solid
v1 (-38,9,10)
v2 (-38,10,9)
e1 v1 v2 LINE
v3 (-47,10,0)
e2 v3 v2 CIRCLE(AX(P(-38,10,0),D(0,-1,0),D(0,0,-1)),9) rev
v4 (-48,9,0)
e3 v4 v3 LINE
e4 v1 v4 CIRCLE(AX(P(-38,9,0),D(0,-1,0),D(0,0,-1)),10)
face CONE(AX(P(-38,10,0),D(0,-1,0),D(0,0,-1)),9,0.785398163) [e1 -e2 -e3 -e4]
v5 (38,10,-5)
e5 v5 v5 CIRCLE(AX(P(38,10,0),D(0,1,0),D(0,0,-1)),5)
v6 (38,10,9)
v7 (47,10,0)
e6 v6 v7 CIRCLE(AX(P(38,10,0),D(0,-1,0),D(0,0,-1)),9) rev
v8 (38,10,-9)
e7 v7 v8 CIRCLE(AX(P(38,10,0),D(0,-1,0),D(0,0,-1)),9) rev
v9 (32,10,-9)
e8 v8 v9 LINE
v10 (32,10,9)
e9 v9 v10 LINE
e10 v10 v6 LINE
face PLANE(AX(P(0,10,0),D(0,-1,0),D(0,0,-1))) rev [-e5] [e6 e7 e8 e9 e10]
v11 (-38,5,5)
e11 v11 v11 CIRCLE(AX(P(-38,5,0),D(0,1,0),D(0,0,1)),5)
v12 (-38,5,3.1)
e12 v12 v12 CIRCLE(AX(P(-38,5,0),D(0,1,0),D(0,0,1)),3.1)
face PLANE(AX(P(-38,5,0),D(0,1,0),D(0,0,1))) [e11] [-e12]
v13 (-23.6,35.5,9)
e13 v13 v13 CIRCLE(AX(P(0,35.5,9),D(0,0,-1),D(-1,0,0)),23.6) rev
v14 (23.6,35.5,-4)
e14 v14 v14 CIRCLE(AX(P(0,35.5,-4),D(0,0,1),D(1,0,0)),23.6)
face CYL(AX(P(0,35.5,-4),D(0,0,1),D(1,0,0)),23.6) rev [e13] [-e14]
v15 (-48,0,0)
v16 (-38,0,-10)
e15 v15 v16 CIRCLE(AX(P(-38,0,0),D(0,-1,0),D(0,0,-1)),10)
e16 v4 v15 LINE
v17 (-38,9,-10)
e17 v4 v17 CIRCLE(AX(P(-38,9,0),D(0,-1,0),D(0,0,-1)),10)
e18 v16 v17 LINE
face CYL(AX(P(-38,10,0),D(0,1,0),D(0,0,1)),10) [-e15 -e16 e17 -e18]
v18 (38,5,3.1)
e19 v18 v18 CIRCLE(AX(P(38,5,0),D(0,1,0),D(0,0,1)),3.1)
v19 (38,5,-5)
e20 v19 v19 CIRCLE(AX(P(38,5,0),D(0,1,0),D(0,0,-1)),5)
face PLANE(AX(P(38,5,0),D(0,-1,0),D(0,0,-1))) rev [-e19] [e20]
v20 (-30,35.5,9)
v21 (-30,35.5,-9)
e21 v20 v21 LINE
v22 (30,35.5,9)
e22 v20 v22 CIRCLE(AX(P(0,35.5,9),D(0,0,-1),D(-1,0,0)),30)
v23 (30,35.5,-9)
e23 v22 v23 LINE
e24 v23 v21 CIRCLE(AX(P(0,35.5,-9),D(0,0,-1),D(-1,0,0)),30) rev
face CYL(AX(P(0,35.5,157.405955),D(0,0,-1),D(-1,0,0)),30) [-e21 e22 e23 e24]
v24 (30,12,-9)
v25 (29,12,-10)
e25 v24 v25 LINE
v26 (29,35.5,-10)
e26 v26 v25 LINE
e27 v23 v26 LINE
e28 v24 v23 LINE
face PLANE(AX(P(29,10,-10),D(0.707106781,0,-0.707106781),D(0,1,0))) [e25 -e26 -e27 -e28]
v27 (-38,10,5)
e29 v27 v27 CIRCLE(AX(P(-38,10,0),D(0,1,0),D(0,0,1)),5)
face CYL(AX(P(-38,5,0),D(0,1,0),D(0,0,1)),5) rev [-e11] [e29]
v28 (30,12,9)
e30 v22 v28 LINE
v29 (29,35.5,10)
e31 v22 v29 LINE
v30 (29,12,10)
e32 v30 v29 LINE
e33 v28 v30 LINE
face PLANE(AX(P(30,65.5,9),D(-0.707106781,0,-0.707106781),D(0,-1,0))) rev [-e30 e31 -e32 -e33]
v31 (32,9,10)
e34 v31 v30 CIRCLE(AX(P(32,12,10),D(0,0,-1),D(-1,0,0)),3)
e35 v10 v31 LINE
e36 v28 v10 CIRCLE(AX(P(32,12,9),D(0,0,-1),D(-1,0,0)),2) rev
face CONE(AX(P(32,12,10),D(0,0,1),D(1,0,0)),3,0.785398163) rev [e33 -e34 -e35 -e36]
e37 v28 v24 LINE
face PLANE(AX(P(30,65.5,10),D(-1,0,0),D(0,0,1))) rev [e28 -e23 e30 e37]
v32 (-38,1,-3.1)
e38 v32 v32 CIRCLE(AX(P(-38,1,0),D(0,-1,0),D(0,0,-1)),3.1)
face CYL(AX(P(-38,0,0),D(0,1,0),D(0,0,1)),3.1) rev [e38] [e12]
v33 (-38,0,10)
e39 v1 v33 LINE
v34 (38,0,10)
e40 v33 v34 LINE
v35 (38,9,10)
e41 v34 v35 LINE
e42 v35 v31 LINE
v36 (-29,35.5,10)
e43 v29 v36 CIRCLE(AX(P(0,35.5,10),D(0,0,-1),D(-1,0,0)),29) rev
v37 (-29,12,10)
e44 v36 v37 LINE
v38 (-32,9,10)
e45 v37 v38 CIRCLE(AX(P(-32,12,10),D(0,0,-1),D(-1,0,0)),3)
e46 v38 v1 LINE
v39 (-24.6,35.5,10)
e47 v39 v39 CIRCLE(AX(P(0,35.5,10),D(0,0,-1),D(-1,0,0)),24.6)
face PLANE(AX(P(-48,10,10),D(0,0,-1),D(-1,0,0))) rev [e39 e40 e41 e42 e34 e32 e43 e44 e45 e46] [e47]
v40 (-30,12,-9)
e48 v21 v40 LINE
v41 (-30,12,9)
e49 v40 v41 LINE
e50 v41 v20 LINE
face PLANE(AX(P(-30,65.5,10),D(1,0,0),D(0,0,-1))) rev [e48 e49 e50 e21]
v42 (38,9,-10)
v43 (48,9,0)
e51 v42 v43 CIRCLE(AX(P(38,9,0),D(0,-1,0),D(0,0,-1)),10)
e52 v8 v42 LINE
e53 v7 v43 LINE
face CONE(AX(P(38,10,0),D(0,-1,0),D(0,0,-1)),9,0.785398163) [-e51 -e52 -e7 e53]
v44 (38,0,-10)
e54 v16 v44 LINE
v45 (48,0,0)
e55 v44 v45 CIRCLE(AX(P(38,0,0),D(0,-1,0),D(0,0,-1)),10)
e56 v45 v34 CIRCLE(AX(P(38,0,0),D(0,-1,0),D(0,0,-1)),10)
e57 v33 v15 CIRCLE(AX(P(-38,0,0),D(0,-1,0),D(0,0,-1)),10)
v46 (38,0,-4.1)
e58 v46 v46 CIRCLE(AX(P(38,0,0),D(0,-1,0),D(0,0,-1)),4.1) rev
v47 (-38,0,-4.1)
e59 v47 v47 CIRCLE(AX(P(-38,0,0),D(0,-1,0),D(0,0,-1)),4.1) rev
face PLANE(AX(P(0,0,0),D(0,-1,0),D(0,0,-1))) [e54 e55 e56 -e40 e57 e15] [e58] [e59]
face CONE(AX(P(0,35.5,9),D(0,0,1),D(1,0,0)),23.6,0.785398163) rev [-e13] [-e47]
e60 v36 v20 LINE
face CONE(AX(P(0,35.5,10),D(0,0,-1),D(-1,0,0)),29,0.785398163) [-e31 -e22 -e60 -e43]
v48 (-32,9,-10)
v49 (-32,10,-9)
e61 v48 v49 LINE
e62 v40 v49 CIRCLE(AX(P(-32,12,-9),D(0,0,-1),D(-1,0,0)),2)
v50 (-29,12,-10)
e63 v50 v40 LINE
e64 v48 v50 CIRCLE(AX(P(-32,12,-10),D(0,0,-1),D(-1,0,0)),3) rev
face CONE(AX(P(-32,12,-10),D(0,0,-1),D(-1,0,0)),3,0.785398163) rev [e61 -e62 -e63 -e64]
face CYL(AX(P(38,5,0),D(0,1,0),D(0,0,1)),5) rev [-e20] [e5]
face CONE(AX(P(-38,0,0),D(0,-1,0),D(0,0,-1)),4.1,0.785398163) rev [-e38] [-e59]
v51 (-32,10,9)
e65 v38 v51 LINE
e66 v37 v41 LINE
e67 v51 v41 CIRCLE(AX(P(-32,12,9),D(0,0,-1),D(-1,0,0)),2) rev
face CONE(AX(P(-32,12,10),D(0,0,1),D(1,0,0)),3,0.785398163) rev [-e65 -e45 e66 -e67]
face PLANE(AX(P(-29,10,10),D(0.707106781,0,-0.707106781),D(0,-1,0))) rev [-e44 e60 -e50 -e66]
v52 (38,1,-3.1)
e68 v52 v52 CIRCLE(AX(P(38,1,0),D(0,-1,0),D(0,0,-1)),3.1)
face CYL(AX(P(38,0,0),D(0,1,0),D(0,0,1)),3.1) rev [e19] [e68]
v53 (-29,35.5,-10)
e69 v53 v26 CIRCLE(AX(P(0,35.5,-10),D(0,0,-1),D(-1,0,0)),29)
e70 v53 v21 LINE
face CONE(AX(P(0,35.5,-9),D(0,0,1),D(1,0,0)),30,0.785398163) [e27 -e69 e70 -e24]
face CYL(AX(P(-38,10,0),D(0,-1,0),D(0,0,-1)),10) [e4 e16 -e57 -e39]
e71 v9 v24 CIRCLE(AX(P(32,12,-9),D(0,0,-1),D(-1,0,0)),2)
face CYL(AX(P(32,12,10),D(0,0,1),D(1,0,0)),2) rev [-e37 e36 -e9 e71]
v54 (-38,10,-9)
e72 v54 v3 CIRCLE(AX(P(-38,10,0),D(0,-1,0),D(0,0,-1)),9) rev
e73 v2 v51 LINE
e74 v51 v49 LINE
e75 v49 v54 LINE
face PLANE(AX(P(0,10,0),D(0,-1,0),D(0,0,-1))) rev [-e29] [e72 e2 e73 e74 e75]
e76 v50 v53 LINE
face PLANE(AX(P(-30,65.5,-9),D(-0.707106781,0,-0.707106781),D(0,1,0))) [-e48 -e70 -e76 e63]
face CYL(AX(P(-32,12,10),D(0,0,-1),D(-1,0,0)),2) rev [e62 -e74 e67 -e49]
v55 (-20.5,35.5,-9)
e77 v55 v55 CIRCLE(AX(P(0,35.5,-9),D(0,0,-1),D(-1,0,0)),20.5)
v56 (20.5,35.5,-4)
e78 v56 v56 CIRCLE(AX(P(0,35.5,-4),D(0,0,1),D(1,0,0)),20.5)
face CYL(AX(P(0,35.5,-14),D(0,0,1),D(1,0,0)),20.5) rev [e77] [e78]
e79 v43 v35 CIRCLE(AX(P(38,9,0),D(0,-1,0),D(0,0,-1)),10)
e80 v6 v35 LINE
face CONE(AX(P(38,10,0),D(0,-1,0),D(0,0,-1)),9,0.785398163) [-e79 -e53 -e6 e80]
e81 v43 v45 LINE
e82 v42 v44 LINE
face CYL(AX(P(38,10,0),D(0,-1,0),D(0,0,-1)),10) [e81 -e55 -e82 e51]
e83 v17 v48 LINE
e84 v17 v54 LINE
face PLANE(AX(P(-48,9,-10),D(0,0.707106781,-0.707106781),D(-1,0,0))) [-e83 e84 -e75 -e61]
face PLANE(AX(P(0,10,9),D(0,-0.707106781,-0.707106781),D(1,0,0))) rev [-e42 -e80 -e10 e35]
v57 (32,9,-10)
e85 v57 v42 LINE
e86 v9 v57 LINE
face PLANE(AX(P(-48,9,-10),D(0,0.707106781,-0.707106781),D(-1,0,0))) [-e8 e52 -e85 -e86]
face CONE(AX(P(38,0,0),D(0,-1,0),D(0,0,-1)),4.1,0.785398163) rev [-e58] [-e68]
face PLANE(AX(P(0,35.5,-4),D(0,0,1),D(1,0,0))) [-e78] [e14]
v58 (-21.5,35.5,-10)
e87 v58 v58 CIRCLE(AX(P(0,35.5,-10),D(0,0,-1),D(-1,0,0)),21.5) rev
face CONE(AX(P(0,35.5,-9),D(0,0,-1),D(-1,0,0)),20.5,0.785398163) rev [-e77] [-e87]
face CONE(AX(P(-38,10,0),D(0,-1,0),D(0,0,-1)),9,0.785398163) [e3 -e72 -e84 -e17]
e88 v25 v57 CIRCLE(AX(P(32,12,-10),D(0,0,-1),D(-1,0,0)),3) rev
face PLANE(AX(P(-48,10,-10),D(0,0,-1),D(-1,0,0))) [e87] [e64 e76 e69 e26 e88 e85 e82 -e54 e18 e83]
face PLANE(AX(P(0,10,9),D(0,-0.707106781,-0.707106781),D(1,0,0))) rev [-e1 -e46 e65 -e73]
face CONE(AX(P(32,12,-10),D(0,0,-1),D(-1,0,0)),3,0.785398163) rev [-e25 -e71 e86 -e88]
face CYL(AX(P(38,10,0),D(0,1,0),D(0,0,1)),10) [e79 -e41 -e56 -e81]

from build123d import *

# Parameters (mm, degrees)
SKETCH_1_W          = 96
SKETCH_1_H          = 20
EXTRUDE_1_DEPTH     = 10
SKETCH_2_R          = 5
CUT_EXTRUDE_1_DEPTH = 5
FILLET_1_R          = 10
SKETCH_3_R          = 3.1
CUT_EXTRUDE_2_DEPTH = 5
CHAMFER_1_SIZE      = 1
SKETCH_4_W          = 60
SKETCH_4_H          = 20
EXTRUDE_2_DEPTH     = 55.5
CUT_EXTRUDE_START   = -20
CUT_EXTRUDE_3_DEPTH = 20
SKETCH_6_4_R        = 23.6
CUT_EXTRUDE_4_DEPTH = 14
SKETCH_7_R          = 20.5
CUT_EXTRUDE_5_DEPTH = 10
FILLET_2_R          = 2
CHAMFER_2_SIZE      = 1
CHAMFER_3_SIZE      = 1


# Read off the part's stored shape, not the designer's step: 切除-拉伸3
with BuildPart() as part:
    # 草图1 → 凸台-拉伸1 (new body)
    with BuildSketch(Plane(origin=(0, 0, 0), x_dir=(1, 0, 0), z_dir=(0, 1, 0))):
        Rectangle(SKETCH_1_W, SKETCH_1_H)
    extrude(amount=EXTRUDE_1_DEPTH)

    # 草图2 → 切除-拉伸1 (cut)
    with BuildSketch(Plane(origin=(0, 10, 0), x_dir=(1, 0, 0), z_dir=(0, 1, 0))):
        with Locations(Location((-38, 0, 0), (0, 0, 270))):
            Circle(SKETCH_2_R)
        with Locations(Location((38, 0, 0), (0, 0, 90))):
            Circle(SKETCH_2_R)
    extrude(amount=-CUT_EXTRUDE_1_DEPTH, mode=Mode.SUBTRACT)

    # 圆角1
    fillet_1_edges = [part.edges().sort_by_distance(p)[0] for p in [
        (48, 5, -10),
        (48, 5, 10),
        (-48, 5, 10),
        (-48, 5, -10),
    ]]
    fillet(fillet_1_edges, radius=FILLET_1_R - 0.0001)  # a hair under: the kernel refuses the full size

    # 草图3 → 切除-拉伸2 (cut)
    with BuildSketch(Plane(origin=(0, 5, 0), x_dir=(1, 0, 0), z_dir=(0, 1, 0))):
        with Locations(Location((-38, 0, 0), (0, 0, 270))):
            Circle(SKETCH_3_R)
        with Locations(Location((38, 0, 0), (0, 0, 270))):
            Circle(SKETCH_3_R)
    extrude(amount=-CUT_EXTRUDE_2_DEPTH, mode=Mode.SUBTRACT)

    # 倒角1
    chamfer_1_edges = [part.edges().sort_by_distance(p)[0] for p in [
        (-38, 0, -3.1),
        (38, 0, -3.1),
    ]]
    chamfer(chamfer_1_edges, length=CHAMFER_1_SIZE)

    # 草图4 → 凸台-拉伸2 (add)
    with BuildSketch(Plane(origin=(0, 10, 0), x_dir=(1, 0, 0), z_dir=(0, 1, 0))):
        Rectangle(SKETCH_4_W, SKETCH_4_H)
    extrude(amount=EXTRUDE_2_DEPTH)

    # 切除-拉伸3 outline → 切除-拉伸3 (cut)
    with BuildSketch(Plane.XY.offset(10).offset(CUT_EXTRUDE_START)):
        with BuildLine():
            Line((-30, 65.5), (-30, 35.5))
            ThreePointArc((-30, 35.5), (-21.213203436, 56.713203436), (0, 65.5))
            Line((0, 65.5), (-30, 65.5))
        make_face()
        with BuildLine():
            Line((30, 65.5), (0, 65.5))
            ThreePointArc((0, 65.5), (21.213203436, 56.713203436), (30, 35.5))
            Line((30, 35.5), (30, 65.5))
        make_face()
    extrude(amount=CUT_EXTRUDE_3_DEPTH, mode=Mode.SUBTRACT)

    # 草图6<4> → 切除-拉伸4 (cut)
    with BuildSketch(Plane.XY.offset(10)):
        with Locations((0, 35.5)):
            Circle(SKETCH_6_4_R)
    extrude(amount=-CUT_EXTRUDE_4_DEPTH, mode=Mode.SUBTRACT)

    # 草图7 → 切除-拉伸5 (cut)
    with BuildSketch(Plane.XY.offset(-4)):
        with Locations((0, 35.5)):
            Circle(SKETCH_7_R)
    extrude(amount=-CUT_EXTRUDE_5_DEPTH, mode=Mode.SUBTRACT)

    # 圆角2
    fillet_2_edges = [part.edges().sort_by_distance(p)[0] for p in [
        (30, 10, 0),
        (-30, 10, 0),
    ]]
    fillet(fillet_2_edges, radius=FILLET_2_R)

    # 倒角2
    chamfer_2_edges = [part.edges().sort_by_distance(p)[0] for p in [
        (35.00005, 10, 10),
        (35.00005, 10, -10),
        (30.585786438, 10.585786438, -10),
        (30.585786438, 10.585786438, 10),
        (-30.585786438, 10.585786438, 10),
        (-30.585786438, 10.585786438, -10),
        (-35.00005, 10, -10),
        (-35.00005, 10, 10),
        (-45.071097101, 10, -7.071097101),
        (-45.071097101, 10, 7.071097101),
        (45.071097101, 10, 7.071097101),
        (45.071097101, 10, -7.071097101),
        (-30, 23.75, 10),
        (-30, 23.75, -10),
        (30, 23.75, -10),
        (30, 23.75, 10),
        (21.213203436, 56.713203436, -10),
        (-21.213203436, 56.713203436, 10),
    ]]
    chamfer(chamfer_2_edges, length=CHAMFER_2_SIZE)

    # 倒角3
    chamfer_3_edges = [part.edges().sort_by_distance(p)[0] for p in [
        (-20.5, 35.5, -10),
        (-23.6, 35.5, 10),
    ]]
    chamfer(chamfer_3_edges, length=CHAMFER_3_SIZE)


solid = part.part
